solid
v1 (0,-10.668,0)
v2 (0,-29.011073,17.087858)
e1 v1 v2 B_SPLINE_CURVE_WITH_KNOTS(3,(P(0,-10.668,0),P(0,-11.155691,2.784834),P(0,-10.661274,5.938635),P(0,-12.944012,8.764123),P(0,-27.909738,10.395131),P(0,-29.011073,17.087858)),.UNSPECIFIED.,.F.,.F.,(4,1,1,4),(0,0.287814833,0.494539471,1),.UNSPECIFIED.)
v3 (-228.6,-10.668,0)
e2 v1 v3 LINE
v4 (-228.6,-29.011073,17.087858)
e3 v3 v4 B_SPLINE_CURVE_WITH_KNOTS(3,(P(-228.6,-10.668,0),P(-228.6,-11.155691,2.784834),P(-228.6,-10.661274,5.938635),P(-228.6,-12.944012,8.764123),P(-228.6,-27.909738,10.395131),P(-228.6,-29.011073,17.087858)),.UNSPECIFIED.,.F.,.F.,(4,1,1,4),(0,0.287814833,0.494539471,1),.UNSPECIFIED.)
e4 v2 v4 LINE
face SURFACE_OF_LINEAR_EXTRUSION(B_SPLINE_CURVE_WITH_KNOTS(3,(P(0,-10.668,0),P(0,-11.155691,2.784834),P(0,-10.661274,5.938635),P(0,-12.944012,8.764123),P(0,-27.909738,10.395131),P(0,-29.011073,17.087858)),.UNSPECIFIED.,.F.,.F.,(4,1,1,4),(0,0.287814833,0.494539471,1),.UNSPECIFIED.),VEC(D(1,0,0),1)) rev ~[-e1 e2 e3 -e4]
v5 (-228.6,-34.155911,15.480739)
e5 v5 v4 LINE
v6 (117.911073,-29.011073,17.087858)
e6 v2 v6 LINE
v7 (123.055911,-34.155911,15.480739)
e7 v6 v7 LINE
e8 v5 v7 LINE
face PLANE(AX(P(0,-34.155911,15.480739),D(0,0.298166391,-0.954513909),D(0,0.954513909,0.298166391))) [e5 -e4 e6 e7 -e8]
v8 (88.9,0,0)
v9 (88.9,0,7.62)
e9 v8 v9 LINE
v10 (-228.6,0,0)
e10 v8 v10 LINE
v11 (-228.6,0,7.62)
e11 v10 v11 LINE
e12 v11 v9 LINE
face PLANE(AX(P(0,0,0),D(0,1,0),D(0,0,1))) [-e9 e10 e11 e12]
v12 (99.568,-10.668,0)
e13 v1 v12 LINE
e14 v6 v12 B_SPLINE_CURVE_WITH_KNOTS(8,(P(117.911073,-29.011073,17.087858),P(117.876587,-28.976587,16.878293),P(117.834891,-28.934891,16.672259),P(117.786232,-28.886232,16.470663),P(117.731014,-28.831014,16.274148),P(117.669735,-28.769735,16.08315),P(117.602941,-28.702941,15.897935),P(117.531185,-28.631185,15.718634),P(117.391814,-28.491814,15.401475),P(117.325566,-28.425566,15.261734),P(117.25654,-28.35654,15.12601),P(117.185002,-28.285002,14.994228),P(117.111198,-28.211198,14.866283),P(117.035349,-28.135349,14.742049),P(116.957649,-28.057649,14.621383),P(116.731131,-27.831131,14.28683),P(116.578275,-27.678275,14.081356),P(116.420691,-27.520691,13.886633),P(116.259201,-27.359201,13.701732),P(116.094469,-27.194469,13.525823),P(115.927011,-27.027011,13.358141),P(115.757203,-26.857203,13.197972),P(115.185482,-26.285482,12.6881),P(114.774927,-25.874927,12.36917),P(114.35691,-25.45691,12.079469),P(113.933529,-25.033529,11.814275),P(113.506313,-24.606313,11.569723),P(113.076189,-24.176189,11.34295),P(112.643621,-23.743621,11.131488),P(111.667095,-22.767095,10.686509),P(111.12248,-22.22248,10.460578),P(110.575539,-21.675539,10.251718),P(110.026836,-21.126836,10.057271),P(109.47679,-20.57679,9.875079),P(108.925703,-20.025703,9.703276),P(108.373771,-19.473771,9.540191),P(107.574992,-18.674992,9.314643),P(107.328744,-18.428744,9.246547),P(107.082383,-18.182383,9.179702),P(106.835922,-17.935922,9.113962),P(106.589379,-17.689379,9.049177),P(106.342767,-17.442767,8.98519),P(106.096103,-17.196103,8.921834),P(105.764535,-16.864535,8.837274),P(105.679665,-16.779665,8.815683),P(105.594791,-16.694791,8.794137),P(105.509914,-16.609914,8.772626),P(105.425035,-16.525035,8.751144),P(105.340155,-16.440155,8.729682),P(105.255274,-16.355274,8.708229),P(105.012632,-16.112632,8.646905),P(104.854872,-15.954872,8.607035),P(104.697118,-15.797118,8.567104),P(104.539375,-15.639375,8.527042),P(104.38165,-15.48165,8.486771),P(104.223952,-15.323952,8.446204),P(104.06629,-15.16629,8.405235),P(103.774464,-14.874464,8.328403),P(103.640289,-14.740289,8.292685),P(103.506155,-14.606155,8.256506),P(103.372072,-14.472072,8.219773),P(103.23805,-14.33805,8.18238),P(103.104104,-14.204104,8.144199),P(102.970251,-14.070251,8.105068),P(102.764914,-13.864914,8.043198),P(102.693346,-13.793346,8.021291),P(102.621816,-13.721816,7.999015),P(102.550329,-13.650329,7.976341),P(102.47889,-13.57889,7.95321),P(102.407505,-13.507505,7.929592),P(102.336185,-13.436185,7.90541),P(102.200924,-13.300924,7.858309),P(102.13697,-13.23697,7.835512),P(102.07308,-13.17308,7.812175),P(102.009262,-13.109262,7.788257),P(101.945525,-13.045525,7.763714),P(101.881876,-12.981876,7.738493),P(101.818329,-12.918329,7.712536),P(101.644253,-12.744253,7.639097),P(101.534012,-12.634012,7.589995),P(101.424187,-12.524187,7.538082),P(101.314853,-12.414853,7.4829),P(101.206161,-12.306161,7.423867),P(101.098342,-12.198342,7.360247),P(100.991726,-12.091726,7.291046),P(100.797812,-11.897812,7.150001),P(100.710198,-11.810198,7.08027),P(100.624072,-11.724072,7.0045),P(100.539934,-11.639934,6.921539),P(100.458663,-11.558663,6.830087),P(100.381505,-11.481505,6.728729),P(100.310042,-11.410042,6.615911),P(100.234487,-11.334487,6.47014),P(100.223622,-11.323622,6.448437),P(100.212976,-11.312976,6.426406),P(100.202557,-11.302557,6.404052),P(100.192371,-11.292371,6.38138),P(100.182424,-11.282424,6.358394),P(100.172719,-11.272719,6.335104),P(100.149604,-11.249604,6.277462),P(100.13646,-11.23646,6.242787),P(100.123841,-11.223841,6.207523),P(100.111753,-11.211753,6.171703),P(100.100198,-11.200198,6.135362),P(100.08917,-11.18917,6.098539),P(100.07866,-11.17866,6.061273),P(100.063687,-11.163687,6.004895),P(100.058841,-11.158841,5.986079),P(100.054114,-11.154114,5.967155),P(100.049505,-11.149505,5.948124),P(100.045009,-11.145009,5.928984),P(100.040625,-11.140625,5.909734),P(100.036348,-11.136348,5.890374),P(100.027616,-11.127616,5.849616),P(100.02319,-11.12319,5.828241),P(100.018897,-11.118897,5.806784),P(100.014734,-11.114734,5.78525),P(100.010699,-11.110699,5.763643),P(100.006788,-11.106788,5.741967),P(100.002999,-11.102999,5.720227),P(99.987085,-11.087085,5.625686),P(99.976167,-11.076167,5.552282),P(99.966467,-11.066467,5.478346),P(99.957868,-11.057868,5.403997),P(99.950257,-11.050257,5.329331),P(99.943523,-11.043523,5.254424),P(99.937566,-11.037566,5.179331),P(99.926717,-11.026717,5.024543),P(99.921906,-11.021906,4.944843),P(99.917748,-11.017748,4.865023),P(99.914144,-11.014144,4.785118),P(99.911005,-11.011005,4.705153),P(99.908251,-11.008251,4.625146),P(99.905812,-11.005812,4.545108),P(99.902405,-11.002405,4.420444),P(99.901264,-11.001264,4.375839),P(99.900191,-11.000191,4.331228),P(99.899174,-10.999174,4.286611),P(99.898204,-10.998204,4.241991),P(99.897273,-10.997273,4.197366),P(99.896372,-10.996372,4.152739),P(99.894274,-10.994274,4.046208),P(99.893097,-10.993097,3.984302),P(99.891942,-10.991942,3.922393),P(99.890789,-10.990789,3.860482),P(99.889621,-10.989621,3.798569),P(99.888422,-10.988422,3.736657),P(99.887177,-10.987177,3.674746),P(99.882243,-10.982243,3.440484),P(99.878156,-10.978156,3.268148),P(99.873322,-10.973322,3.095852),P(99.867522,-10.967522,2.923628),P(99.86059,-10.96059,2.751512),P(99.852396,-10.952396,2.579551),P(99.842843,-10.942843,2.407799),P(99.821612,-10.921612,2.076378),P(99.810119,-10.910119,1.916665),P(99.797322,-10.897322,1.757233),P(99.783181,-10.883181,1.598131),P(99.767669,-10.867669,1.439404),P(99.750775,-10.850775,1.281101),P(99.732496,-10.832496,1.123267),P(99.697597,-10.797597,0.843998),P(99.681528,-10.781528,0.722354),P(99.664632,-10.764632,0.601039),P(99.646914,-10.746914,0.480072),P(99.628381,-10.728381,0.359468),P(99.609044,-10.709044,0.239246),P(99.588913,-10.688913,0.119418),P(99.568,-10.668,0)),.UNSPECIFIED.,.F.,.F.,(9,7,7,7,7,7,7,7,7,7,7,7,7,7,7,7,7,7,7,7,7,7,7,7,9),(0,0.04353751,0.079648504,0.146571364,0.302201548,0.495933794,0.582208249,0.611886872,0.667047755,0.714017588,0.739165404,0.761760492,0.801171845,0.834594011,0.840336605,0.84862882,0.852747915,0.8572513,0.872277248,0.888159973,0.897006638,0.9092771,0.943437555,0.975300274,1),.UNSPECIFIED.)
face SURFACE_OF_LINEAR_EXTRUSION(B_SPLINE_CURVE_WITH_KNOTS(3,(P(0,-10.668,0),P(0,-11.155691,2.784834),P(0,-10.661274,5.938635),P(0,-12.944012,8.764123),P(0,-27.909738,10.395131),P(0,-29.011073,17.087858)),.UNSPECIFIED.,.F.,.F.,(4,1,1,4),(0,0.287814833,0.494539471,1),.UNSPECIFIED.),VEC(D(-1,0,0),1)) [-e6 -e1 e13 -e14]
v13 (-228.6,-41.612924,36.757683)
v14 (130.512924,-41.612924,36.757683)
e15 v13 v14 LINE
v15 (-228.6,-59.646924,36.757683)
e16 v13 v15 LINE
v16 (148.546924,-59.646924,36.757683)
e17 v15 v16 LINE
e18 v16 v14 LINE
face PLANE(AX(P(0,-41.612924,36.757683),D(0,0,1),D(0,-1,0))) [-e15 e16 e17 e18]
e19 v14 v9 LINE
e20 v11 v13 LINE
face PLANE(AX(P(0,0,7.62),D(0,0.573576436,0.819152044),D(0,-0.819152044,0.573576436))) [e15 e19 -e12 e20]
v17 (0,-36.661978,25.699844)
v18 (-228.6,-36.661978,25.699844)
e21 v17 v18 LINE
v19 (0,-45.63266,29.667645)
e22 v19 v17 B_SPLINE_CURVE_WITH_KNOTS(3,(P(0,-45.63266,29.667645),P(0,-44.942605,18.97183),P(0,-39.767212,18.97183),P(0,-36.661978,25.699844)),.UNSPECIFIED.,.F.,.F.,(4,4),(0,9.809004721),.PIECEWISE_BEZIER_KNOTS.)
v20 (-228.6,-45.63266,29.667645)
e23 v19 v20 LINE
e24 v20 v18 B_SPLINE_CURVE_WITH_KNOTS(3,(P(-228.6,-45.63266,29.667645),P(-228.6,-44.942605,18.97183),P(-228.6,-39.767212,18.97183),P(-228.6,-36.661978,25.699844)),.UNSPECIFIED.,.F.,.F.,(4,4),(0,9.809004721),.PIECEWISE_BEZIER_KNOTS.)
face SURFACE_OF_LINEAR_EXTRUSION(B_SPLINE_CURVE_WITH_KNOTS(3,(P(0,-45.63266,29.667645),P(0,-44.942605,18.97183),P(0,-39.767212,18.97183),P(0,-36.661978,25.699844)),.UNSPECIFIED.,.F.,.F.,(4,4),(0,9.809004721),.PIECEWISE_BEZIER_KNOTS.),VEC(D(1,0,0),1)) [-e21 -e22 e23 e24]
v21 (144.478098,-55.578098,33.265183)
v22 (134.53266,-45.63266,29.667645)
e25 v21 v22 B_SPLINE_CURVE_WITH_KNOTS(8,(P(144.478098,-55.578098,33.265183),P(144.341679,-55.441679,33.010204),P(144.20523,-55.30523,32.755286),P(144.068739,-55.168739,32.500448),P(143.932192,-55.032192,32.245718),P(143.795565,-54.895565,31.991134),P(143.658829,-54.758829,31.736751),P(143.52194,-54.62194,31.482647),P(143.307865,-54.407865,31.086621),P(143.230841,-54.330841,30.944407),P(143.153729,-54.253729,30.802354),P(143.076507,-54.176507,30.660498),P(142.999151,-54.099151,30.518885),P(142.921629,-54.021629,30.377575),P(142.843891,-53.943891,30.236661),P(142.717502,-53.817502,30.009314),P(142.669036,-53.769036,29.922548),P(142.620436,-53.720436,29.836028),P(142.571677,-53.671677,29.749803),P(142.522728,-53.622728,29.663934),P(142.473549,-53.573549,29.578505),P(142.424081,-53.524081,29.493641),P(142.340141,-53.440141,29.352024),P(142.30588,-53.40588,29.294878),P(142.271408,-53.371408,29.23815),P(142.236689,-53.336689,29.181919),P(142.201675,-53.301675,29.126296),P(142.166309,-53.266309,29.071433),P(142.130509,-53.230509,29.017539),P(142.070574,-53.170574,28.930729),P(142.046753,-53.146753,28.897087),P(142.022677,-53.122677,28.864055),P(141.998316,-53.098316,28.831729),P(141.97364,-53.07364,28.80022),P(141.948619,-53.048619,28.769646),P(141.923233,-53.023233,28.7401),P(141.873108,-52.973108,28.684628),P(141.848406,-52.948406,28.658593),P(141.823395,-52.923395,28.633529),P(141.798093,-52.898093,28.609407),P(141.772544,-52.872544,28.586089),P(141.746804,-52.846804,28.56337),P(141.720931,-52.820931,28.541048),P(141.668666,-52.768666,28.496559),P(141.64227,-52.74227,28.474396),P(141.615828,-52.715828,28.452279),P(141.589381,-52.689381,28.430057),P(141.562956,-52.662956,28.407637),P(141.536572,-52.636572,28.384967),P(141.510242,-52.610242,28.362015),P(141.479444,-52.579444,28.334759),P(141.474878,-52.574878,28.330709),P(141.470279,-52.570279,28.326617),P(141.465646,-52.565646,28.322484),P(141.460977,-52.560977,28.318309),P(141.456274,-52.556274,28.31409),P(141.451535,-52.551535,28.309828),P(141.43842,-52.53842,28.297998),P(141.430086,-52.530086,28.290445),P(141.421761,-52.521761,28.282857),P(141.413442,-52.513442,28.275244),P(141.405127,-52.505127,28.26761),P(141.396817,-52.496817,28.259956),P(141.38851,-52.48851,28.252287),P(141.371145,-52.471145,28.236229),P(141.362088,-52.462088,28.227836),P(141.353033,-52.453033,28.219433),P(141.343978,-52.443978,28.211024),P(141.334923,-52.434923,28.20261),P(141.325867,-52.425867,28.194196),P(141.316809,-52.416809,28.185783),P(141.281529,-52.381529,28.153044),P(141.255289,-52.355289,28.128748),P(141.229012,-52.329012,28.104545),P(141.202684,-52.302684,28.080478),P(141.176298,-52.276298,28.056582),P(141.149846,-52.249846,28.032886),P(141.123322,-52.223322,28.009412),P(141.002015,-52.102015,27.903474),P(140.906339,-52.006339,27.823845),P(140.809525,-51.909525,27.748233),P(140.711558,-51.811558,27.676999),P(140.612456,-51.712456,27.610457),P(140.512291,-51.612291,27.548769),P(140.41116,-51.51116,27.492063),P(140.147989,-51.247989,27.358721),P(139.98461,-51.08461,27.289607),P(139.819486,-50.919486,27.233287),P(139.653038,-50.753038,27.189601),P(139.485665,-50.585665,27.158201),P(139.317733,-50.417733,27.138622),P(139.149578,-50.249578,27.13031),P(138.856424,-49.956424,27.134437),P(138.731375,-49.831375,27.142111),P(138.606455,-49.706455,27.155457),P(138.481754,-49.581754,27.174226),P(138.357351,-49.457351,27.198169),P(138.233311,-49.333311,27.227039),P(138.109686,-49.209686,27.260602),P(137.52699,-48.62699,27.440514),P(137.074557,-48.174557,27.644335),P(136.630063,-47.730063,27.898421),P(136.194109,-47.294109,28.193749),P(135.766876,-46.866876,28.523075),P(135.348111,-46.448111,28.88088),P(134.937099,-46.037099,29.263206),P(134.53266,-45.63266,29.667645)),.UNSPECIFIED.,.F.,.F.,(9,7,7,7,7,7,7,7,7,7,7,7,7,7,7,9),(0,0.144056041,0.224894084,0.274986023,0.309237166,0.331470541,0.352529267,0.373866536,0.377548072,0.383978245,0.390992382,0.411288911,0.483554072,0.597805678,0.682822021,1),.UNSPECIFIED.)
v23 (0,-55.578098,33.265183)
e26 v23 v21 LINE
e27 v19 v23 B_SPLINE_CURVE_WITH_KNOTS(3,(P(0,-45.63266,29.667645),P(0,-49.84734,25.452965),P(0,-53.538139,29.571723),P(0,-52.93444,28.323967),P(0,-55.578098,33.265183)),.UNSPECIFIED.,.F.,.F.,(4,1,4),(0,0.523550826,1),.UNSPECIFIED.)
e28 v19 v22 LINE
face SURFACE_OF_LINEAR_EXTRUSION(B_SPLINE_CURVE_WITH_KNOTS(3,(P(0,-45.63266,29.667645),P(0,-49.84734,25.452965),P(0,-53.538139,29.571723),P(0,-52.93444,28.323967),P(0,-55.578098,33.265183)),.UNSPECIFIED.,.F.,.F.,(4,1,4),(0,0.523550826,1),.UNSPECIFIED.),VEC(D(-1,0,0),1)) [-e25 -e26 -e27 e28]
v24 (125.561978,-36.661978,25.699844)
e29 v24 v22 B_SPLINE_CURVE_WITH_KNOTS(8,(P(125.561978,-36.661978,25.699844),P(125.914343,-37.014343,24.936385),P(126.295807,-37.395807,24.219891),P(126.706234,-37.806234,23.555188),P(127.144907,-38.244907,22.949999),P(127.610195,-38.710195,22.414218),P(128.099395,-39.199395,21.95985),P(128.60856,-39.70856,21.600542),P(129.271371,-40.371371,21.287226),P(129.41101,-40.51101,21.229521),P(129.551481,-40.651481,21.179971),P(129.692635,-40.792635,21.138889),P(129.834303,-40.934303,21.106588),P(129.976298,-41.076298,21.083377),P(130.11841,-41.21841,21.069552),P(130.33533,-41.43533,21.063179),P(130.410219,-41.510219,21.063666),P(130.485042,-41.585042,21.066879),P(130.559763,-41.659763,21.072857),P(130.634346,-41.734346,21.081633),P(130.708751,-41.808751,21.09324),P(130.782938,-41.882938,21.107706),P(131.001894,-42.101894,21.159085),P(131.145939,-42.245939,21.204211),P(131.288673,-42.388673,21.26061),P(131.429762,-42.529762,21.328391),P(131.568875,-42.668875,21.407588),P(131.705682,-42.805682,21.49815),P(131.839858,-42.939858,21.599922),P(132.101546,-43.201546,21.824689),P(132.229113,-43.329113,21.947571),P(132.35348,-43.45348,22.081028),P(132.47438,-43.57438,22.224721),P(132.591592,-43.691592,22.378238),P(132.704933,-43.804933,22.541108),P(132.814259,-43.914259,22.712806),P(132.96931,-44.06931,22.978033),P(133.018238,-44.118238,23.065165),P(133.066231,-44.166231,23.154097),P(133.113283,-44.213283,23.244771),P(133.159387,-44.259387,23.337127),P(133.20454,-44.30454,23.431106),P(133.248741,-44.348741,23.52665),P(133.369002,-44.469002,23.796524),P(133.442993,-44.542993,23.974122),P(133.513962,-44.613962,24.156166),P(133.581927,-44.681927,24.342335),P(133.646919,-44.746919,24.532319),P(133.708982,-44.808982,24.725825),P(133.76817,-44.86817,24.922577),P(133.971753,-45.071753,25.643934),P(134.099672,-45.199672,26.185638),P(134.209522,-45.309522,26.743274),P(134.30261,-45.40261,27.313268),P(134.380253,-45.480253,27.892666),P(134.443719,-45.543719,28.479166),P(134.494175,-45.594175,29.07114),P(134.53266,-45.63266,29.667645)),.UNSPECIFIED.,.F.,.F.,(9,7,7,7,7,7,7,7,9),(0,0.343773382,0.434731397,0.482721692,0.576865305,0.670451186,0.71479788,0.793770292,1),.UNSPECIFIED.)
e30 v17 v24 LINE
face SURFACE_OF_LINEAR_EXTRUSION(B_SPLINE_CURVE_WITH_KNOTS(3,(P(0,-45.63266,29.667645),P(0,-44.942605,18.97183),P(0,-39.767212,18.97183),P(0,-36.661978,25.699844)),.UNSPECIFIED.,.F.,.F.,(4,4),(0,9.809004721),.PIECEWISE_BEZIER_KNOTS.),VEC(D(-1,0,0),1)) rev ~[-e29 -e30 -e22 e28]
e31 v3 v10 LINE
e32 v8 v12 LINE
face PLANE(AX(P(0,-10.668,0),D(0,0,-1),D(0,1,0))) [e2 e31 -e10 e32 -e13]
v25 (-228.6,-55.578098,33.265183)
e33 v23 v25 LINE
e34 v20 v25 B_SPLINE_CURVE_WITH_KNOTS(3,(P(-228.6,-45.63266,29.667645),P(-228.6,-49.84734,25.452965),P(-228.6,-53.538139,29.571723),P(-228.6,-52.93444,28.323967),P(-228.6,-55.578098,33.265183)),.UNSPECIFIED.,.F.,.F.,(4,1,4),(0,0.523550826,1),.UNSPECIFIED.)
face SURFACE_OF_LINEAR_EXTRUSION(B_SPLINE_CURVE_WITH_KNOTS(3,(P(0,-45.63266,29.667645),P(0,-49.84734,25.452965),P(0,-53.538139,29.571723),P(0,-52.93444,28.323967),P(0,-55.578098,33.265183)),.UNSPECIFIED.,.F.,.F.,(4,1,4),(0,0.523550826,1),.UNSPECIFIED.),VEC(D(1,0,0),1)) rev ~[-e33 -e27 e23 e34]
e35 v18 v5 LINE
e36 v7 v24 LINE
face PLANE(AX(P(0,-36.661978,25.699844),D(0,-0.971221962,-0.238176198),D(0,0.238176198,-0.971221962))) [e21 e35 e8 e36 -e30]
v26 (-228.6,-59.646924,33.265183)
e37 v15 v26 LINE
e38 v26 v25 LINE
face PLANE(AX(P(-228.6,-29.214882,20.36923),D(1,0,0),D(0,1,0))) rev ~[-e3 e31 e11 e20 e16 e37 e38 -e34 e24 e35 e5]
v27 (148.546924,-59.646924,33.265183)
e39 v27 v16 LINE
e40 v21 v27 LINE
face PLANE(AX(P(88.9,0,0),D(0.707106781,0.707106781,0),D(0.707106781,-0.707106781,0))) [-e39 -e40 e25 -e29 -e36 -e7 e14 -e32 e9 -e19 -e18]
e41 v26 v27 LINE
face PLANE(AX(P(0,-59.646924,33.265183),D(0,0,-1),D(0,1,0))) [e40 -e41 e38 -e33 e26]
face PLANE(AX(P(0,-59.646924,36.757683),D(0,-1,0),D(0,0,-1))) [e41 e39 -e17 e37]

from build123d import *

# Parameters (mm, degrees)
F1_DEPTH      = 177.8
F1_DEPTH_BACK = 228.6
F3_DEPTH      = 36.7586830666


# Not quite as in the source:
# - a feature names something its author has since deleted; it is built from what else it names


with BuildPart() as f1:
    # F0 (on Right) → F1 (new body, two sides)
    with BuildSketch(Plane.YZ) as f1_sk:
        with BuildLine():
            Line((0, 0), (0, 7.62))
            Line((0, 7.62), (-41.6129238499, 36.7576829666))
            Line((-41.6129238499, 36.7576829666), (-59.6469238499, 36.7576829666))
            Line((-59.6469238499, 36.7576829666), (-59.6469238499, 33.2651829666))
            Line((-59.6469238499, 33.2651829666), (-55.5780977011, 33.2651829666))
            add(Edge.make_bspline(
                [(-45.6326596341, 29.6676454746), (-49.8473398191, 25.4529652896), (-53.5381393586, 29.571723151), (-52.9344401232, 28.3239668416), (-55.5780977011, 33.2651829666)],
                knots=[0, 0, 0, 0, 0.5235508263, 1, 1, 1, 1], degree=3))
            add(Edge.make_bspline(
                [(-45.6326596341, 29.6676454746), (-44.9426054856, 18.9718303883), (-39.7672124109, 18.9718303883), (-36.6619780561, 25.6998443657)],
                knots=[0, 0, 0, 0, 9.8090047208, 9.8090047208, 9.8090047208, 9.8090047208], degree=3))
            Line((-36.6619780561, 25.6998443657), (-34.1559106391, 15.4807388001))
            Line((-34.1559106391, 15.4807388001), (-29.0110725909, 17.0878581703))
            add(Edge.make_bspline(
                [(-10.668, 0), (-11.1556913461, 2.7848342744), (-10.6612735812, 5.9386353992), (-12.9440118592, 8.7641226677), (-27.9097380346, 10.3951310482), (-29.0110725909, 17.0878581703)],
                knots=[0, 0, 0, 0, 0.2878148332, 0.4945394705, 1, 1, 1, 1], degree=3))
            Line((-10.668, 0), (0, 0))
        make_face()
    extrude(amount=F1_DEPTH)
    extrude(f1_sk.sketch, amount=-F1_DEPTH_BACK)

    # F2 (on Top) → F3 (cut, through all)
    with BuildSketch(Plane.XY):
        Polygon((184.1130062819, 0), (88.9, 0), (184.1130062819, -95.2130062819), align=None)
    extrude(amount=F3_DEPTH, mode=Mode.SUBTRACT)


solid = f1.part
